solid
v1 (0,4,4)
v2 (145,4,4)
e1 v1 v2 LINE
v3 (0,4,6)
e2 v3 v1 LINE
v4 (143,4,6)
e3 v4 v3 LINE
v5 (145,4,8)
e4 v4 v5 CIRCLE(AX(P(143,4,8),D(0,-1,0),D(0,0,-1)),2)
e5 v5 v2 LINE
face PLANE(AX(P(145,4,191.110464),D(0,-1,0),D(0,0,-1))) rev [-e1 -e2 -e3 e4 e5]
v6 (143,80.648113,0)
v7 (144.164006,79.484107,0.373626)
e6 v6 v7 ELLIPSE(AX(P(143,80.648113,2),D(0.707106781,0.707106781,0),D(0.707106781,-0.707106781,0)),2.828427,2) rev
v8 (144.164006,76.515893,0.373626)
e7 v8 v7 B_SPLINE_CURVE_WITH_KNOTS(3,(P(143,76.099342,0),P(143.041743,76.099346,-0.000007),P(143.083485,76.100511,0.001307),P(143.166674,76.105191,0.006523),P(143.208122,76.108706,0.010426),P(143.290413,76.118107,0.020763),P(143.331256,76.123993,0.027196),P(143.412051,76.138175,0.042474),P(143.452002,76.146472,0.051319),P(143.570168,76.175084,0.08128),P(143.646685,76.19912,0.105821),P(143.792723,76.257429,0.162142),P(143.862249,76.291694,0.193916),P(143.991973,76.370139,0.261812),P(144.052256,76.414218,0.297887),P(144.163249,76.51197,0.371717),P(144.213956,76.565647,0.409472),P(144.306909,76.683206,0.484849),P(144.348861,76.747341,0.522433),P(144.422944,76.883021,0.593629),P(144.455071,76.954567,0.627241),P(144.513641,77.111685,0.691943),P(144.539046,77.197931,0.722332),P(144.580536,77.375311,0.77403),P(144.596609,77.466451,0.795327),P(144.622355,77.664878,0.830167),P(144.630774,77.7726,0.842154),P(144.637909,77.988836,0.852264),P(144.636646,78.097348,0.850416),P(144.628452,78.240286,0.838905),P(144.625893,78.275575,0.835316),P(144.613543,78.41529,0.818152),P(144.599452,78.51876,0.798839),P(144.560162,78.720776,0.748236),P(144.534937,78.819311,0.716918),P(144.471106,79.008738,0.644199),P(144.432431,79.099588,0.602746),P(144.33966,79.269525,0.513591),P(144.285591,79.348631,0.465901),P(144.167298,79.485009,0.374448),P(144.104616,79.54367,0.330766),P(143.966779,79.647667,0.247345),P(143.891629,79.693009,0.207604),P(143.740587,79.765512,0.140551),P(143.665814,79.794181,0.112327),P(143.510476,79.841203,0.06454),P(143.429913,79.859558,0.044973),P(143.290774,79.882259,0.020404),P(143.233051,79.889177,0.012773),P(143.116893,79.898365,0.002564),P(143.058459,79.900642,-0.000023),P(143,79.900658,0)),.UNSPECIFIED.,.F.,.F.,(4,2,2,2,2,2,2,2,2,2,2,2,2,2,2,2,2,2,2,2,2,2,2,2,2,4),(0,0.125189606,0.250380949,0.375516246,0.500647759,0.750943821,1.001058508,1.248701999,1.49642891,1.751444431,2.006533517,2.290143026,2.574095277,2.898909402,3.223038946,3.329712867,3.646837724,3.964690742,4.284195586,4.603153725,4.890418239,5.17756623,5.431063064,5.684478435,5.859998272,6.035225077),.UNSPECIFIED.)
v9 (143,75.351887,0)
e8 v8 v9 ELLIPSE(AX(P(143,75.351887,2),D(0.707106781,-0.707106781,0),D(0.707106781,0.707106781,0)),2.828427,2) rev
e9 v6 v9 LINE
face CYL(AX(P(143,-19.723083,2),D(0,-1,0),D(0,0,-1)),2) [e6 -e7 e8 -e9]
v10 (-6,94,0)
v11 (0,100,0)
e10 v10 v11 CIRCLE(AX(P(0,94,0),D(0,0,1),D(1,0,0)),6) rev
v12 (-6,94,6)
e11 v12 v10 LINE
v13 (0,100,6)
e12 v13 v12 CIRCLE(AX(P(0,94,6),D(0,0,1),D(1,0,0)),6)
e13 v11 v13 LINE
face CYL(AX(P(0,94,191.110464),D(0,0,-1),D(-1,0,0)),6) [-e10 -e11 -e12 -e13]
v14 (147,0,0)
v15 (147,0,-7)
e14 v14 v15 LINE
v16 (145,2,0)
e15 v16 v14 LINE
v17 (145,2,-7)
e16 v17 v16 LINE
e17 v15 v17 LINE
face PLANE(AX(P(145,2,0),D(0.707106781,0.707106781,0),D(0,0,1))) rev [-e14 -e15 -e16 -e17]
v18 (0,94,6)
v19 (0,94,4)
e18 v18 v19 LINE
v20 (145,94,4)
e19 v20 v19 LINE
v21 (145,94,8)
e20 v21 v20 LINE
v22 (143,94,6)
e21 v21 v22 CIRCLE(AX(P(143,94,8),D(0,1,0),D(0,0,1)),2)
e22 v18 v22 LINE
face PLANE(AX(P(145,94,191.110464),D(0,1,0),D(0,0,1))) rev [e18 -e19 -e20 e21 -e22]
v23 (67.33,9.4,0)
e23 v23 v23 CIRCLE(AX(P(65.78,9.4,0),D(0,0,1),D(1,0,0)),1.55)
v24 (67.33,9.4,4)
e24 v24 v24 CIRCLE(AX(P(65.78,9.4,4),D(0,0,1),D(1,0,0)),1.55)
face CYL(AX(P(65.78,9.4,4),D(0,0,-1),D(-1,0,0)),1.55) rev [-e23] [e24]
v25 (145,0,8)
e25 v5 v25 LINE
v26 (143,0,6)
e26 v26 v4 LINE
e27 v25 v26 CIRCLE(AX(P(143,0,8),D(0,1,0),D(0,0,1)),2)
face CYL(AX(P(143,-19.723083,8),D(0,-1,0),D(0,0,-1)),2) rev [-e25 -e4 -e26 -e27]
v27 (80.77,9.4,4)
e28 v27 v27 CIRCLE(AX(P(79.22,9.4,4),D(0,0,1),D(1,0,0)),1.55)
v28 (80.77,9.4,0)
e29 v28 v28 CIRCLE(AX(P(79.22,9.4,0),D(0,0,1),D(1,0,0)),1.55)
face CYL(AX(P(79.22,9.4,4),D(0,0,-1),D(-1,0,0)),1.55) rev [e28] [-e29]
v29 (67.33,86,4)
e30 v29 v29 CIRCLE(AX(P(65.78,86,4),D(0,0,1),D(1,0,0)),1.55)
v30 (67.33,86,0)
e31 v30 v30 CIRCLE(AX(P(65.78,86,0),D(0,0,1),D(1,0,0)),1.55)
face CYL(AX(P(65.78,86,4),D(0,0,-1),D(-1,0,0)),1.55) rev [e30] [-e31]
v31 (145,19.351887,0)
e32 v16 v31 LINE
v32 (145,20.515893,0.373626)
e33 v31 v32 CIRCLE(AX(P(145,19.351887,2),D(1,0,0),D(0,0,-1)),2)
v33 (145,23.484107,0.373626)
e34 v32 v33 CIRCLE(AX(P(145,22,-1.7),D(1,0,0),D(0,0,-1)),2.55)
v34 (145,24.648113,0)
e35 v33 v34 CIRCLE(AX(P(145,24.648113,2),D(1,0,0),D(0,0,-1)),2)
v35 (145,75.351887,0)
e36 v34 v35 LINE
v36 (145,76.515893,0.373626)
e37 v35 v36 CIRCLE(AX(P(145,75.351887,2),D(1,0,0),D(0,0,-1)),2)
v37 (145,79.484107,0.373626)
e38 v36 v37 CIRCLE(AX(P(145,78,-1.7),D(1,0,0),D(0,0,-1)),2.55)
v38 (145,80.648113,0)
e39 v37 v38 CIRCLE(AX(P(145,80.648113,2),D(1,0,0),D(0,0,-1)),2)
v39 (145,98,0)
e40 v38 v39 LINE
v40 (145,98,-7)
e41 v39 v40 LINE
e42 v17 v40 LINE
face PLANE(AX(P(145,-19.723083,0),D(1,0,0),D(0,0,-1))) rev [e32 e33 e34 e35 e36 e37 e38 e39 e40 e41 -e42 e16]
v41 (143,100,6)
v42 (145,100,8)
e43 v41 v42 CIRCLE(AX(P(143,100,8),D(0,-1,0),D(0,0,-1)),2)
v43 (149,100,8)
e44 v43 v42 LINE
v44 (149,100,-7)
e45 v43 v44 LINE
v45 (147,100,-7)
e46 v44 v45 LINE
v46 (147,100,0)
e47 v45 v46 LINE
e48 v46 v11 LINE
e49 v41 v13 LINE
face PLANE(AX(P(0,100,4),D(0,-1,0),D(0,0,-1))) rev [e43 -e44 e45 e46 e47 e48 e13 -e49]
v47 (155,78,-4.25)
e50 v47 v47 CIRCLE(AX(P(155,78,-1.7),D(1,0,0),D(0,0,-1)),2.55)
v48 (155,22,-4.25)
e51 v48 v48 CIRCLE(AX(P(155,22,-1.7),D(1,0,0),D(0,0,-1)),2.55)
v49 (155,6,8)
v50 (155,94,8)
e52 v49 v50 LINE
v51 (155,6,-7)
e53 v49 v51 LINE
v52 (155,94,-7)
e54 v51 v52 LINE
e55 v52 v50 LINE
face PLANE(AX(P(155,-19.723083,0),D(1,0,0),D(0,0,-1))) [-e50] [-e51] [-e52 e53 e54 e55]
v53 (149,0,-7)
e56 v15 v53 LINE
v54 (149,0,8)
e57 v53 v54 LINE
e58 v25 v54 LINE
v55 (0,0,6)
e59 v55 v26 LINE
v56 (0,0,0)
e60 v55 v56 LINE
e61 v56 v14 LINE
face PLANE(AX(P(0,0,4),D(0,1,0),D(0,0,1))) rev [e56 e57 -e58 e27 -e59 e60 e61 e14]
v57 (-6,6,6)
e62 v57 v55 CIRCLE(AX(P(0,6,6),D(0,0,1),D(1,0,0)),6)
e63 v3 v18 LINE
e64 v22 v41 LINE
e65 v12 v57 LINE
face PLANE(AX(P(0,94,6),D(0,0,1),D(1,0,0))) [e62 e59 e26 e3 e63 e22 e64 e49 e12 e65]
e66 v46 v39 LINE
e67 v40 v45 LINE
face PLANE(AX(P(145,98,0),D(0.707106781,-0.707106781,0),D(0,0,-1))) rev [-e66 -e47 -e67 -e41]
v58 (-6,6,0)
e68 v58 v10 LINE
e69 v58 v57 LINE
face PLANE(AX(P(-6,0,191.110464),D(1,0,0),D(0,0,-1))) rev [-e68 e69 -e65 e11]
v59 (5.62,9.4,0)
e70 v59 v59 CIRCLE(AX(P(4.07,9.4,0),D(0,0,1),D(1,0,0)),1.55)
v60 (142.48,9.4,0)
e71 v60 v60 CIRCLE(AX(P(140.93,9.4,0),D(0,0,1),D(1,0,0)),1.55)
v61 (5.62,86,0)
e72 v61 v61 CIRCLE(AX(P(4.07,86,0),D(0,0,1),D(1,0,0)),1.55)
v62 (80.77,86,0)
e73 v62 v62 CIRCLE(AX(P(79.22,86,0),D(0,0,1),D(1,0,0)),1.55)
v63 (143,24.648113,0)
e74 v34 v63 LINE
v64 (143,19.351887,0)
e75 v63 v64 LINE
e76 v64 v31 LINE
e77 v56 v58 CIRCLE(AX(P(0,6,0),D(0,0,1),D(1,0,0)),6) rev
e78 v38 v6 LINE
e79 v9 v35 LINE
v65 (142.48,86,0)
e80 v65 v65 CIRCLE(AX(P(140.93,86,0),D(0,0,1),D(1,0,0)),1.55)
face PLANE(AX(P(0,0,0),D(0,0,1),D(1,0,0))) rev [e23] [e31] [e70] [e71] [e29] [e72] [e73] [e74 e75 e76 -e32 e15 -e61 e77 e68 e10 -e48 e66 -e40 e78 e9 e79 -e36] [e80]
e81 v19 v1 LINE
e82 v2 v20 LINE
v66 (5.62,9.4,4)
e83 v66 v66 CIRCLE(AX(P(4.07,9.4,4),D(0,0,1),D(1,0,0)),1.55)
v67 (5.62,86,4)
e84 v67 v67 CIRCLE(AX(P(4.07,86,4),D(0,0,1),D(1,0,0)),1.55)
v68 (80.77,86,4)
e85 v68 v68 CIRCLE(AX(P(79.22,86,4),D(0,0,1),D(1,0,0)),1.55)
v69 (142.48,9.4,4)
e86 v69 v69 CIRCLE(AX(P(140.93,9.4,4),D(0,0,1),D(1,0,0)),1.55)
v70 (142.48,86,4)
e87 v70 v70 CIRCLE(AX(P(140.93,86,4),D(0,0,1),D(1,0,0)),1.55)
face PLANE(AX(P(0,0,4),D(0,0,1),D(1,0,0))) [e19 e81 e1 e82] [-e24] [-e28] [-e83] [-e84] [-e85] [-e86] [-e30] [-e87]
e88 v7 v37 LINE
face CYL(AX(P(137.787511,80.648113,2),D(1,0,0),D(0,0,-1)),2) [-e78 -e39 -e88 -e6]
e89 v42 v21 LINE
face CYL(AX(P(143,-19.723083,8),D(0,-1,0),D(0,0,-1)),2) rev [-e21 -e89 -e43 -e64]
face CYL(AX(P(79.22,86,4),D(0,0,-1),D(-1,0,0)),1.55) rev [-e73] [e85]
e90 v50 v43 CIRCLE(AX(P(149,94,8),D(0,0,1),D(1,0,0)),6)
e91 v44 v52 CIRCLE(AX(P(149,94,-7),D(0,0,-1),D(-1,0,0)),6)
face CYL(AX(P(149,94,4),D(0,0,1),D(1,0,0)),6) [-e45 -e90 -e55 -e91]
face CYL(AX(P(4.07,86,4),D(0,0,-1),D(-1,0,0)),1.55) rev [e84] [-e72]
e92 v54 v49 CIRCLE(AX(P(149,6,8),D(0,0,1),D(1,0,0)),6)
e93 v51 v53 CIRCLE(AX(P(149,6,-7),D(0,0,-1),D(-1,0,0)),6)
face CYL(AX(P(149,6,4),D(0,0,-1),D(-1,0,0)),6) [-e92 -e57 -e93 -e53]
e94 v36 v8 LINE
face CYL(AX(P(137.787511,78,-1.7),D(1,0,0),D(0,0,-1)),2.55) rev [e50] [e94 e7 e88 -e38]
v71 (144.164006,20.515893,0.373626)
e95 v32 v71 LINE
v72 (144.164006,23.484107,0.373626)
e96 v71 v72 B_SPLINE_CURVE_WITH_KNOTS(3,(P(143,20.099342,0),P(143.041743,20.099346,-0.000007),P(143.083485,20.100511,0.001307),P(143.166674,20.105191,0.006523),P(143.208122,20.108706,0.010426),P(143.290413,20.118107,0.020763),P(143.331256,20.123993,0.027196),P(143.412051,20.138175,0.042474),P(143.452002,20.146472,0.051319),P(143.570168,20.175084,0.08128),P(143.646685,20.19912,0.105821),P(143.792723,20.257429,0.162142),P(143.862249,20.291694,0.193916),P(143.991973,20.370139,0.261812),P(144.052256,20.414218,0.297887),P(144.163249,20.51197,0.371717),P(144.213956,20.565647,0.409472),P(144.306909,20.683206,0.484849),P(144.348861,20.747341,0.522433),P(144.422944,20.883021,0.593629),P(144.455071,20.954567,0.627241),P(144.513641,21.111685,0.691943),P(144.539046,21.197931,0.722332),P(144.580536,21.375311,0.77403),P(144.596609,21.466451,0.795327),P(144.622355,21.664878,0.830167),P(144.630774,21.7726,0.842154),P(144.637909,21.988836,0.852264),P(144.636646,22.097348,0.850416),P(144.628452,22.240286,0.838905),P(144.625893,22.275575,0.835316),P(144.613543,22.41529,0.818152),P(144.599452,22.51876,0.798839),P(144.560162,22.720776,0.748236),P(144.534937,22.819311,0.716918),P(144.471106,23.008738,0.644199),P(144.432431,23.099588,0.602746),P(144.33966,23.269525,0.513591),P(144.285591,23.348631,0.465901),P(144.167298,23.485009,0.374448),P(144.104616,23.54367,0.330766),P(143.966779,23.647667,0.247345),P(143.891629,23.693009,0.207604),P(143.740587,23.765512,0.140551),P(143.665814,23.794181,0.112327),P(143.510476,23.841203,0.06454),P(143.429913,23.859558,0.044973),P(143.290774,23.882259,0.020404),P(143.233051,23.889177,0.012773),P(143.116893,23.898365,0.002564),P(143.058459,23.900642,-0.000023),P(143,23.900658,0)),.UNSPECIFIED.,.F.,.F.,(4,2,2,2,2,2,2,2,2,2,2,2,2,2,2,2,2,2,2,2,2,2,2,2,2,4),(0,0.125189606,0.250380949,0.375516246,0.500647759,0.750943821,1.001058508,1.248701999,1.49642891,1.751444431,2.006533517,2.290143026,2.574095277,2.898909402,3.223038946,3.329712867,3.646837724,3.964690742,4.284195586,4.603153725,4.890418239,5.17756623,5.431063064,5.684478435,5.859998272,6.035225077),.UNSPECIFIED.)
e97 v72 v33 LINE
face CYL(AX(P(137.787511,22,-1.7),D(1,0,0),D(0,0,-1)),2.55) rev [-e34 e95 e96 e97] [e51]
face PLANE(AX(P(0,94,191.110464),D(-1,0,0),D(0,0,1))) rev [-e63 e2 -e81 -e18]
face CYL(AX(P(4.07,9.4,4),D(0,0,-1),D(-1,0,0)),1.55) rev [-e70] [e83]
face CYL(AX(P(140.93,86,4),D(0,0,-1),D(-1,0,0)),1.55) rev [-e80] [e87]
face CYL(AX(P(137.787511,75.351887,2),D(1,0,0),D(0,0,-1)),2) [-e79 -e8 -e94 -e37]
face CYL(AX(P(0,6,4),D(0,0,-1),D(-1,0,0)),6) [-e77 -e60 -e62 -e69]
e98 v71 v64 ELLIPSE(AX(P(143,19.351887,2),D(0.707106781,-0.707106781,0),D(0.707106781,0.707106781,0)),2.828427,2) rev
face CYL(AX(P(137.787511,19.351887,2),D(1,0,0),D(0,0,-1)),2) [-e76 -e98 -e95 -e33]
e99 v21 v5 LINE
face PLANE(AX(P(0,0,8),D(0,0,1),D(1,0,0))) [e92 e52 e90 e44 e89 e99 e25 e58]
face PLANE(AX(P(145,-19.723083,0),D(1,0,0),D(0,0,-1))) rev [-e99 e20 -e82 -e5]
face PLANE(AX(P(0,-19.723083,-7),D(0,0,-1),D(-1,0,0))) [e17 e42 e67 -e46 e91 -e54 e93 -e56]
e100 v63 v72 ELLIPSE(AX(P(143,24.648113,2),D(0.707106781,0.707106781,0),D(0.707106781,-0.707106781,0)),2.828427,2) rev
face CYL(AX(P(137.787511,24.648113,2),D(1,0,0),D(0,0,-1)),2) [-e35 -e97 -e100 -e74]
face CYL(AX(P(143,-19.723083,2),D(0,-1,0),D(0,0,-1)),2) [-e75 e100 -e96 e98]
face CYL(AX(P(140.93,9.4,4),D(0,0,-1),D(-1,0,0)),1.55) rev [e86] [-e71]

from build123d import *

# Parameters (mm, degrees)
SKETCH1_W                       = 5.3
SKETCH1_H                       = 76.6
SKETCH1_H_2                     = 9.4
SKETCH1_H_3                     = 14
BOSS_EXTRUDE1_DEPTH             = 4
BOSS_EXTRUDE2_DEPTH             = 100
BOSS_EXTRUDE3_REACH             = 186.786
BOSS_EXTRUDE3_DIRECTION_2_REACH = 186.786
FILLET1_R                       = 6
CHAMFER1_SIZE                   = 2
CUT_EXTRUDE1_START              = -4
CUT_EXTRUDE1_DEPTH              = 4
BOSS_EXTRUDE4_DEPTH             = 2
FILLET3_R                       = 2
CUT_EXTRUDE2_START              = -10
CUT_EXTRUDE2_DEPTH              = 10
FILLET4_R                       = 2
FILLET5_R                       = 2


# Some blends are built 0.0001 mm under size
with BuildPart() as part:
    # Sketch1 → Boss-Extrude1 (new body)
    with BuildSketch(Plane.XY):
        with BuildLine():
            Line((0, 100), (0, 0))
            Line((0, 0), (4.07, 0))
            Line((4.07, 0), (4.07, 7.85))
            ThreePointArc((4.07, 7.85), (2.52, 9.4), (4.07, 10.95))
            Line((4.07, 10.95), (4.07, 84.45))
            ThreePointArc((4.07, 84.45), (2.52, 86), (4.07, 87.55))
            Line((4.07, 87.55), (4.07, 100))
            Line((4.07, 100), (0, 100))
        make_face()
        with BuildLine():
            Line((65.78, 100), (4.07, 100))
            Line((4.07, 100), (4.07, 87.55))
            ThreePointArc((4.07, 87.55), (5.166015511, 87.096015511), (5.62, 86))
            Line((5.62, 86), (64.23, 86))
            ThreePointArc((64.23, 86), (64.683984489, 87.096015511), (65.78, 87.55))
            Line((65.78, 87.55), (65.78, 100))
        make_face()
        with BuildLine():
            Line((4.07, 84.45), (4.07, 10.95))
            ThreePointArc((4.07, 10.95), (5.166015511, 10.496015511), (5.62, 9.4))
            Line((5.62, 9.4), (64.23, 9.4))
            ThreePointArc((64.23, 9.4), (64.683984489, 10.496015511), (65.78, 10.95))
            Line((65.78, 10.95), (65.78, 84.45))
            ThreePointArc((65.78, 84.45), (64.683984489, 84.903984489), (64.23, 86))
            Line((64.23, 86), (5.62, 86))
            ThreePointArc((5.62, 86), (5.166015511, 84.903984489), (4.07, 84.45))
        make_face()
        with BuildLine():
            Line((4.07, 7.85), (4.07, 0))
            Line((4.07, 0), (65.78, 0))
            Line((65.78, 0), (65.78, 7.85))
            ThreePointArc((65.78, 7.85), (64.683984489, 8.303984489), (64.23, 9.4))
            Line((64.23, 9.4), (5.62, 9.4))
            ThreePointArc((5.62, 9.4), (5.166015511, 8.303984489), (4.07, 7.85))
        make_face()
        with BuildLine():
            Line((67.33, 9.4), (69.85, 9.4))
            Line((69.85, 9.4), (69.85, 86))
            Line((69.85, 86), (67.33, 86))
            ThreePointArc((67.33, 86), (66.876015511, 84.903984489), (65.78, 84.45))
            Line((65.78, 84.45), (65.78, 10.95))
            ThreePointArc((65.78, 10.95), (66.876015511, 10.496015511), (67.33, 9.4))
        make_face()
        with Locations((72.5, 47.7)):
            Rectangle(SKETCH1_W, SKETCH1_H)
        with BuildLine():
            Line((75.15, 86), (75.15, 9.4))
            Line((75.15, 9.4), (77.67, 9.4))
            ThreePointArc((77.67, 9.4), (78.123984489, 10.496015511), (79.22, 10.95))
            Line((79.22, 10.95), (79.22, 84.45))
            ThreePointArc((79.22, 84.45), (78.123984489, 84.903984489), (77.67, 86))
            Line((77.67, 86), (75.15, 86))
        make_face()
        with BuildLine():
            Line((65.78, 7.85), (65.78, 0))
            Line((65.78, 0), (69.85, 0))
            Line((69.85, 0), (69.85, 9.4))
            Line((69.85, 9.4), (67.33, 9.4))
            ThreePointArc((67.33, 9.4), (66.876015511, 8.303984489), (65.78, 7.85))
        make_face()
        with Locations((72.5, 4.7)):
            Rectangle(SKETCH1_W, SKETCH1_H_2)
        with BuildLine():
            Line((75.15, 9.4), (75.15, 0))
            Line((75.15, 0), (79.22, 0))
            Line((79.22, 0), (79.22, 7.85))
            ThreePointArc((79.22, 7.85), (78.123984489, 8.303984489), (77.67, 9.4))
            Line((77.67, 9.4), (75.15, 9.4))
        make_face()
        with BuildLine():
            Line((69.85, 100), (65.78, 100))
            Line((65.78, 100), (65.78, 87.55))
            ThreePointArc((65.78, 87.55), (66.876015511, 87.096015511), (67.33, 86))
            Line((67.33, 86), (69.85, 86))
            Line((69.85, 86), (69.85, 100))
        make_face()
        with Locations((72.5, 93)):
            Rectangle(SKETCH1_W, SKETCH1_H_3)
        with BuildLine():
            Line((79.22, 100), (75.15, 100))
            Line((75.15, 100), (75.15, 86))
            Line((75.15, 86), (77.67, 86))
            ThreePointArc((77.67, 86), (78.123984489, 87.096015511), (79.22, 87.55))
            Line((79.22, 87.55), (79.22, 100))
        make_face()
        with BuildLine():
            Line((140.93, 100), (79.22, 100))
            Line((79.22, 100), (79.22, 87.55))
            ThreePointArc((79.22, 87.55), (80.316015511, 87.096015511), (80.77, 86))
            Line((80.77, 86), (139.38, 86))
            ThreePointArc((139.38, 86), (139.833984489, 87.096015511), (140.93, 87.55))
            Line((140.93, 87.55), (140.93, 100))
        make_face()
        with BuildLine():
            ThreePointArc((79.22, 10.95), (80.316015511, 10.496015511), (80.77, 9.4))
            Line((80.77, 9.4), (139.38, 9.4))
            ThreePointArc((139.38, 9.4), (139.833984489, 10.496015511), (140.93, 10.95))
            Line((140.93, 10.95), (140.93, 84.45))
            ThreePointArc((140.93, 84.45), (139.833984489, 84.903984489), (139.38, 86))
            Line((139.38, 86), (80.77, 86))
            ThreePointArc((80.77, 86), (80.316015511, 84.903984489), (79.22, 84.45))
            Line((79.22, 84.45), (79.22, 10.95))
        make_face()
        with BuildLine():
            Line((140.93, 7.85), (140.93, 0))
            Line((140.93, 0), (145, 0))
            Line((145, 0), (145, 100))
            Line((145, 100), (140.93, 100))
            Line((140.93, 100), (140.93, 87.55))
            ThreePointArc((140.93, 87.55), (142.026015511, 87.096015511), (142.48, 86))
            ThreePointArc((142.48, 86), (142.026015511, 84.903984489), (140.93, 84.45))
            Line((140.93, 84.45), (140.93, 10.95))
            ThreePointArc((140.93, 10.95), (142.026015511, 10.496015511), (142.48, 9.4))
            ThreePointArc((142.48, 9.4), (142.026015511, 8.303984489), (140.93, 7.85))
        make_face()
        with BuildLine():
            Line((79.22, 7.85), (79.22, 0))
            Line((79.22, 0), (140.93, 0))
            Line((140.93, 0), (140.93, 7.85))
            ThreePointArc((140.93, 7.85), (139.833984489, 8.303984489), (139.38, 9.4))
            Line((139.38, 9.4), (80.77, 9.4))
            ThreePointArc((80.77, 9.4), (80.316015511, 8.303984489), (79.22, 7.85))
        make_face()
    extrude(amount=BOSS_EXTRUDE1_DEPTH)

    # Sketch2 → Boss-Extrude2 (add)
    with BuildSketch(Plane(origin=(0, 100, 0), x_dir=(1, 0, 0), z_dir=(0, 1, 0))):
        Polygon((145, 7), (145, 0), (145, -4), (145, -10), (155, -10), (155, 7), align=None)
    extrude(amount=-BOSS_EXTRUDE2_DEPTH)

    # Boss-Extrude3: up to this face of the body (flat: up to its plane)
    boss_extrude3_end = Plane(part.part.faces().sort_by_distance((150, 50, 10))[0])
    # Sketch3 → Boss-Extrude3 (add, up to the picked face)
    with BuildSketch(Plane.XY.offset(4), mode=Mode.PRIVATE) as boss_extrude3_sk1:
        Polygon((145, 100), (145, 94), (0, 94), (0, 4), (145, 4), (145, 0), (0, 0), (-6, 0), (-6, 100), align=None)
    boss_extrude3_tool1 = split(extrude(boss_extrude3_sk1.sketch, amount=BOSS_EXTRUDE3_REACH, mode=Mode.PRIVATE), bisect_by=boss_extrude3_end, keep=Keep.BOTH, mode=Mode.PRIVATE)
    add(boss_extrude3_tool1.solids().sort_by(Axis((143.188895, 97, 4), (0, 0, 1)))[0])

    # Boss-Extrude3 direction 2: up to this face of the body (flat: up to its plane)
    boss_extrude3_direction_2_end = Plane(part.part.faces().sort_by_distance((72.5, 50.009617792, 0))[0])
    # Sketch3 → Boss-Extrude3 direction 2 (add, up to the picked face)
    with BuildSketch(Plane.XY.offset(4), mode=Mode.PRIVATE) as boss_extrude3_direction_2_sk1:
        Polygon((145, 100), (145, 94), (0, 94), (0, 4), (145, 4), (145, 0), (0, 0), (-6, 0), (-6, 100), align=None)
    boss_extrude3_direction_2_tool1 = split(extrude(boss_extrude3_direction_2_sk1.sketch, amount=-BOSS_EXTRUDE3_DIRECTION_2_REACH, mode=Mode.PRIVATE), bisect_by=boss_extrude3_direction_2_end, keep=Keep.BOTH, mode=Mode.PRIVATE)
    add(boss_extrude3_direction_2_tool1.solids().sort_by(Axis((143.188895, 97, 4), (0, 0, -1)))[0])

    # Fillet1
    fillet1_edges = [part.edges().sort_by_distance(p)[0] for p in [
        (155, 100, 1.5),
        (155, 0, 1.5),
        (-6, 0, 5),
        (-6, 100, 5),
    ]]
    fillet(fillet1_edges, radius=FILLET1_R)

    # Chamfer1
    chamfer1_edges = [part.edges().sort_by_distance(p)[0] for p in [
        (145, 0, -3.5),
        (145, 100, -3.5),
    ]]
    chamfer(chamfer1_edges, length=CHAMFER1_SIZE)

    # Sketch4 → Cut-Extrude1 (cut)
    with BuildSketch(Plane.XY.offset(10).offset(CUT_EXTRUDE1_START)):
        with BuildLine():
            Line((-6, 94), (-6, 6))
            ThreePointArc((-6, 6), (-4.242640687, 1.757359313), (0, 0))
            Line((0, 0), (149, 0))
            ThreePointArc((149, 0), (153.242640687, 1.757359313), (155, 6))
            Line((155, 6), (155, 94))
            ThreePointArc((155, 94), (153.242640687, 98.242640687), (149, 100))
            Line((149, 100), (0, 100))
            ThreePointArc((0, 100), (-4.242640687, 98.242640687), (-6, 94))
        make_face()
    extrude(amount=CUT_EXTRUDE1_DEPTH, mode=Mode.SUBTRACT)

    # Sketch5 → Boss-Extrude4 (add)
    with BuildSketch(Plane.XY.offset(6)):
        with BuildLine():
            Line((145, 100), (145, 94))
            Line((145, 94), (145, 4))
            Line((145, 4), (145, 0))
            Line((145, 0), (149, 0))
            ThreePointArc((149, 0), (153.242640687, 1.757359313), (155, 6))
            Line((155, 6), (155, 94))
            ThreePointArc((155, 94), (153.242640687, 98.242640687), (149, 100))
            Line((149, 100), (145, 100))
        make_face()
    extrude(amount=BOSS_EXTRUDE4_DEPTH)

    # Fillet3
    fillet3_edges = [part.edges().sort_by_distance(p)[0] for p in [
        (145, 2, 6),
        (145, 97, 6),
    ]]
    fillet(fillet3_edges, radius=FILLET3_R - 0.0001)  # a hair under: the kernel refuses the full size

    # Sketch6 → Cut-Extrude2 (cut)
    with BuildSketch(Plane(origin=(155, 0, 0), x_dir=(0, 0, -1), z_dir=(1, 0, 0)).offset(CUT_EXTRUDE2_START)):
        with BuildLine():
            ThreePointArc((4.25, 78), (3.503122292, 79.803122292), (1.7, 80.55))
            Line((1.7, 80.55), (1.7, 78))
            Line((1.7, 78), (1.7, 75.45))
            ThreePointArc((1.7, 75.45), (3.503122292, 76.196877708), (4.25, 78))
        make_face()
        with BuildLine():
            Line((1.7, 78), (1.7, 80.55))
            ThreePointArc((1.7, 80.55), (-0.85, 78), (1.7, 75.45))
            Line((1.7, 75.45), (1.7, 78))
        make_face()
        with BuildLine():
            ThreePointArc((4.25, 22), (3.503122292, 23.803122292), (1.7, 24.55))
            Line((1.7, 24.55), (1.7, 22))
            Line((1.7, 22), (1.7, 19.45))
            ThreePointArc((1.7, 19.45), (3.503122292, 20.196877708), (4.25, 22))
        make_face()
        with BuildLine():
            Line((1.7, 22), (1.7, 24.55))
            ThreePointArc((1.7, 24.55), (-0.85, 22), (1.7, 19.45))
            Line((1.7, 19.45), (1.7, 22))
        make_face()
    extrude(amount=CUT_EXTRUDE2_DEPTH, mode=Mode.SUBTRACT)

    # Fillet4
    # the kernel refuses this fillet: 2 mm, written as the material it takes off along each edge
    with BuildSketch(Plane(origin=(145, 15.099342219, 0), x_dir=(-1, 0, 0), z_dir=(0, 1, 0))) as fillet4_piece_1_section:
        with BuildLine():
            CenterArc((FILLET4_R, FILLET4_R), FILLET4_R, 180, 90)
            Line((0, FILLET4_R), (0, 0))
            Line((0, 0), (FILLET4_R, 0))
        make_face()
    fillet4_piece_1 = extrude(amount=13.801315562, mode=Mode.PRIVATE)
    fillet4_piece_1 = fillet4_piece_1 & Plane(origin=(144.444640092, 22, -1.7), x_dir=(0, -1, 0), z_dir=(-1, 0, 0)) * Cylinder(2.55, 36, mode=Mode.PRIVATE)
    add(fillet4_piece_1, mode=Mode.SUBTRACT)
    with BuildSketch(Plane(origin=(145, 71.099342219, 0), x_dir=(-1, 0, 0), z_dir=(0, 1, 0))) as fillet4_piece_2_section:
        with BuildLine():
            CenterArc((FILLET4_R, FILLET4_R), FILLET4_R, 180, 90)
            Line((0, FILLET4_R), (0, 0))
            Line((0, 0), (FILLET4_R, 0))
        make_face()
    fillet4_piece_2 = extrude(amount=13.801315562, mode=Mode.PRIVATE)
    fillet4_piece_2 = fillet4_piece_2 & Plane(origin=(144.444640092, 78, -1.7), x_dir=(0, -1, 0), z_dir=(-1, 0, 0)) * Cylinder(2.55, 36, mode=Mode.PRIVATE)
    add(fillet4_piece_2, mode=Mode.SUBTRACT)

    # Fillet5
    fillet5_edges = [part.edges().sort_by_distance(p)[0] for p in [
        (144, 76.099342219, 0),
        (144, 79.900657781, 0),
        (144, 20.099342219, 0),
        (144, 23.900657781, 0),
    ]]
    fillet(fillet5_edges, radius=FILLET5_R)


solid = part.part
